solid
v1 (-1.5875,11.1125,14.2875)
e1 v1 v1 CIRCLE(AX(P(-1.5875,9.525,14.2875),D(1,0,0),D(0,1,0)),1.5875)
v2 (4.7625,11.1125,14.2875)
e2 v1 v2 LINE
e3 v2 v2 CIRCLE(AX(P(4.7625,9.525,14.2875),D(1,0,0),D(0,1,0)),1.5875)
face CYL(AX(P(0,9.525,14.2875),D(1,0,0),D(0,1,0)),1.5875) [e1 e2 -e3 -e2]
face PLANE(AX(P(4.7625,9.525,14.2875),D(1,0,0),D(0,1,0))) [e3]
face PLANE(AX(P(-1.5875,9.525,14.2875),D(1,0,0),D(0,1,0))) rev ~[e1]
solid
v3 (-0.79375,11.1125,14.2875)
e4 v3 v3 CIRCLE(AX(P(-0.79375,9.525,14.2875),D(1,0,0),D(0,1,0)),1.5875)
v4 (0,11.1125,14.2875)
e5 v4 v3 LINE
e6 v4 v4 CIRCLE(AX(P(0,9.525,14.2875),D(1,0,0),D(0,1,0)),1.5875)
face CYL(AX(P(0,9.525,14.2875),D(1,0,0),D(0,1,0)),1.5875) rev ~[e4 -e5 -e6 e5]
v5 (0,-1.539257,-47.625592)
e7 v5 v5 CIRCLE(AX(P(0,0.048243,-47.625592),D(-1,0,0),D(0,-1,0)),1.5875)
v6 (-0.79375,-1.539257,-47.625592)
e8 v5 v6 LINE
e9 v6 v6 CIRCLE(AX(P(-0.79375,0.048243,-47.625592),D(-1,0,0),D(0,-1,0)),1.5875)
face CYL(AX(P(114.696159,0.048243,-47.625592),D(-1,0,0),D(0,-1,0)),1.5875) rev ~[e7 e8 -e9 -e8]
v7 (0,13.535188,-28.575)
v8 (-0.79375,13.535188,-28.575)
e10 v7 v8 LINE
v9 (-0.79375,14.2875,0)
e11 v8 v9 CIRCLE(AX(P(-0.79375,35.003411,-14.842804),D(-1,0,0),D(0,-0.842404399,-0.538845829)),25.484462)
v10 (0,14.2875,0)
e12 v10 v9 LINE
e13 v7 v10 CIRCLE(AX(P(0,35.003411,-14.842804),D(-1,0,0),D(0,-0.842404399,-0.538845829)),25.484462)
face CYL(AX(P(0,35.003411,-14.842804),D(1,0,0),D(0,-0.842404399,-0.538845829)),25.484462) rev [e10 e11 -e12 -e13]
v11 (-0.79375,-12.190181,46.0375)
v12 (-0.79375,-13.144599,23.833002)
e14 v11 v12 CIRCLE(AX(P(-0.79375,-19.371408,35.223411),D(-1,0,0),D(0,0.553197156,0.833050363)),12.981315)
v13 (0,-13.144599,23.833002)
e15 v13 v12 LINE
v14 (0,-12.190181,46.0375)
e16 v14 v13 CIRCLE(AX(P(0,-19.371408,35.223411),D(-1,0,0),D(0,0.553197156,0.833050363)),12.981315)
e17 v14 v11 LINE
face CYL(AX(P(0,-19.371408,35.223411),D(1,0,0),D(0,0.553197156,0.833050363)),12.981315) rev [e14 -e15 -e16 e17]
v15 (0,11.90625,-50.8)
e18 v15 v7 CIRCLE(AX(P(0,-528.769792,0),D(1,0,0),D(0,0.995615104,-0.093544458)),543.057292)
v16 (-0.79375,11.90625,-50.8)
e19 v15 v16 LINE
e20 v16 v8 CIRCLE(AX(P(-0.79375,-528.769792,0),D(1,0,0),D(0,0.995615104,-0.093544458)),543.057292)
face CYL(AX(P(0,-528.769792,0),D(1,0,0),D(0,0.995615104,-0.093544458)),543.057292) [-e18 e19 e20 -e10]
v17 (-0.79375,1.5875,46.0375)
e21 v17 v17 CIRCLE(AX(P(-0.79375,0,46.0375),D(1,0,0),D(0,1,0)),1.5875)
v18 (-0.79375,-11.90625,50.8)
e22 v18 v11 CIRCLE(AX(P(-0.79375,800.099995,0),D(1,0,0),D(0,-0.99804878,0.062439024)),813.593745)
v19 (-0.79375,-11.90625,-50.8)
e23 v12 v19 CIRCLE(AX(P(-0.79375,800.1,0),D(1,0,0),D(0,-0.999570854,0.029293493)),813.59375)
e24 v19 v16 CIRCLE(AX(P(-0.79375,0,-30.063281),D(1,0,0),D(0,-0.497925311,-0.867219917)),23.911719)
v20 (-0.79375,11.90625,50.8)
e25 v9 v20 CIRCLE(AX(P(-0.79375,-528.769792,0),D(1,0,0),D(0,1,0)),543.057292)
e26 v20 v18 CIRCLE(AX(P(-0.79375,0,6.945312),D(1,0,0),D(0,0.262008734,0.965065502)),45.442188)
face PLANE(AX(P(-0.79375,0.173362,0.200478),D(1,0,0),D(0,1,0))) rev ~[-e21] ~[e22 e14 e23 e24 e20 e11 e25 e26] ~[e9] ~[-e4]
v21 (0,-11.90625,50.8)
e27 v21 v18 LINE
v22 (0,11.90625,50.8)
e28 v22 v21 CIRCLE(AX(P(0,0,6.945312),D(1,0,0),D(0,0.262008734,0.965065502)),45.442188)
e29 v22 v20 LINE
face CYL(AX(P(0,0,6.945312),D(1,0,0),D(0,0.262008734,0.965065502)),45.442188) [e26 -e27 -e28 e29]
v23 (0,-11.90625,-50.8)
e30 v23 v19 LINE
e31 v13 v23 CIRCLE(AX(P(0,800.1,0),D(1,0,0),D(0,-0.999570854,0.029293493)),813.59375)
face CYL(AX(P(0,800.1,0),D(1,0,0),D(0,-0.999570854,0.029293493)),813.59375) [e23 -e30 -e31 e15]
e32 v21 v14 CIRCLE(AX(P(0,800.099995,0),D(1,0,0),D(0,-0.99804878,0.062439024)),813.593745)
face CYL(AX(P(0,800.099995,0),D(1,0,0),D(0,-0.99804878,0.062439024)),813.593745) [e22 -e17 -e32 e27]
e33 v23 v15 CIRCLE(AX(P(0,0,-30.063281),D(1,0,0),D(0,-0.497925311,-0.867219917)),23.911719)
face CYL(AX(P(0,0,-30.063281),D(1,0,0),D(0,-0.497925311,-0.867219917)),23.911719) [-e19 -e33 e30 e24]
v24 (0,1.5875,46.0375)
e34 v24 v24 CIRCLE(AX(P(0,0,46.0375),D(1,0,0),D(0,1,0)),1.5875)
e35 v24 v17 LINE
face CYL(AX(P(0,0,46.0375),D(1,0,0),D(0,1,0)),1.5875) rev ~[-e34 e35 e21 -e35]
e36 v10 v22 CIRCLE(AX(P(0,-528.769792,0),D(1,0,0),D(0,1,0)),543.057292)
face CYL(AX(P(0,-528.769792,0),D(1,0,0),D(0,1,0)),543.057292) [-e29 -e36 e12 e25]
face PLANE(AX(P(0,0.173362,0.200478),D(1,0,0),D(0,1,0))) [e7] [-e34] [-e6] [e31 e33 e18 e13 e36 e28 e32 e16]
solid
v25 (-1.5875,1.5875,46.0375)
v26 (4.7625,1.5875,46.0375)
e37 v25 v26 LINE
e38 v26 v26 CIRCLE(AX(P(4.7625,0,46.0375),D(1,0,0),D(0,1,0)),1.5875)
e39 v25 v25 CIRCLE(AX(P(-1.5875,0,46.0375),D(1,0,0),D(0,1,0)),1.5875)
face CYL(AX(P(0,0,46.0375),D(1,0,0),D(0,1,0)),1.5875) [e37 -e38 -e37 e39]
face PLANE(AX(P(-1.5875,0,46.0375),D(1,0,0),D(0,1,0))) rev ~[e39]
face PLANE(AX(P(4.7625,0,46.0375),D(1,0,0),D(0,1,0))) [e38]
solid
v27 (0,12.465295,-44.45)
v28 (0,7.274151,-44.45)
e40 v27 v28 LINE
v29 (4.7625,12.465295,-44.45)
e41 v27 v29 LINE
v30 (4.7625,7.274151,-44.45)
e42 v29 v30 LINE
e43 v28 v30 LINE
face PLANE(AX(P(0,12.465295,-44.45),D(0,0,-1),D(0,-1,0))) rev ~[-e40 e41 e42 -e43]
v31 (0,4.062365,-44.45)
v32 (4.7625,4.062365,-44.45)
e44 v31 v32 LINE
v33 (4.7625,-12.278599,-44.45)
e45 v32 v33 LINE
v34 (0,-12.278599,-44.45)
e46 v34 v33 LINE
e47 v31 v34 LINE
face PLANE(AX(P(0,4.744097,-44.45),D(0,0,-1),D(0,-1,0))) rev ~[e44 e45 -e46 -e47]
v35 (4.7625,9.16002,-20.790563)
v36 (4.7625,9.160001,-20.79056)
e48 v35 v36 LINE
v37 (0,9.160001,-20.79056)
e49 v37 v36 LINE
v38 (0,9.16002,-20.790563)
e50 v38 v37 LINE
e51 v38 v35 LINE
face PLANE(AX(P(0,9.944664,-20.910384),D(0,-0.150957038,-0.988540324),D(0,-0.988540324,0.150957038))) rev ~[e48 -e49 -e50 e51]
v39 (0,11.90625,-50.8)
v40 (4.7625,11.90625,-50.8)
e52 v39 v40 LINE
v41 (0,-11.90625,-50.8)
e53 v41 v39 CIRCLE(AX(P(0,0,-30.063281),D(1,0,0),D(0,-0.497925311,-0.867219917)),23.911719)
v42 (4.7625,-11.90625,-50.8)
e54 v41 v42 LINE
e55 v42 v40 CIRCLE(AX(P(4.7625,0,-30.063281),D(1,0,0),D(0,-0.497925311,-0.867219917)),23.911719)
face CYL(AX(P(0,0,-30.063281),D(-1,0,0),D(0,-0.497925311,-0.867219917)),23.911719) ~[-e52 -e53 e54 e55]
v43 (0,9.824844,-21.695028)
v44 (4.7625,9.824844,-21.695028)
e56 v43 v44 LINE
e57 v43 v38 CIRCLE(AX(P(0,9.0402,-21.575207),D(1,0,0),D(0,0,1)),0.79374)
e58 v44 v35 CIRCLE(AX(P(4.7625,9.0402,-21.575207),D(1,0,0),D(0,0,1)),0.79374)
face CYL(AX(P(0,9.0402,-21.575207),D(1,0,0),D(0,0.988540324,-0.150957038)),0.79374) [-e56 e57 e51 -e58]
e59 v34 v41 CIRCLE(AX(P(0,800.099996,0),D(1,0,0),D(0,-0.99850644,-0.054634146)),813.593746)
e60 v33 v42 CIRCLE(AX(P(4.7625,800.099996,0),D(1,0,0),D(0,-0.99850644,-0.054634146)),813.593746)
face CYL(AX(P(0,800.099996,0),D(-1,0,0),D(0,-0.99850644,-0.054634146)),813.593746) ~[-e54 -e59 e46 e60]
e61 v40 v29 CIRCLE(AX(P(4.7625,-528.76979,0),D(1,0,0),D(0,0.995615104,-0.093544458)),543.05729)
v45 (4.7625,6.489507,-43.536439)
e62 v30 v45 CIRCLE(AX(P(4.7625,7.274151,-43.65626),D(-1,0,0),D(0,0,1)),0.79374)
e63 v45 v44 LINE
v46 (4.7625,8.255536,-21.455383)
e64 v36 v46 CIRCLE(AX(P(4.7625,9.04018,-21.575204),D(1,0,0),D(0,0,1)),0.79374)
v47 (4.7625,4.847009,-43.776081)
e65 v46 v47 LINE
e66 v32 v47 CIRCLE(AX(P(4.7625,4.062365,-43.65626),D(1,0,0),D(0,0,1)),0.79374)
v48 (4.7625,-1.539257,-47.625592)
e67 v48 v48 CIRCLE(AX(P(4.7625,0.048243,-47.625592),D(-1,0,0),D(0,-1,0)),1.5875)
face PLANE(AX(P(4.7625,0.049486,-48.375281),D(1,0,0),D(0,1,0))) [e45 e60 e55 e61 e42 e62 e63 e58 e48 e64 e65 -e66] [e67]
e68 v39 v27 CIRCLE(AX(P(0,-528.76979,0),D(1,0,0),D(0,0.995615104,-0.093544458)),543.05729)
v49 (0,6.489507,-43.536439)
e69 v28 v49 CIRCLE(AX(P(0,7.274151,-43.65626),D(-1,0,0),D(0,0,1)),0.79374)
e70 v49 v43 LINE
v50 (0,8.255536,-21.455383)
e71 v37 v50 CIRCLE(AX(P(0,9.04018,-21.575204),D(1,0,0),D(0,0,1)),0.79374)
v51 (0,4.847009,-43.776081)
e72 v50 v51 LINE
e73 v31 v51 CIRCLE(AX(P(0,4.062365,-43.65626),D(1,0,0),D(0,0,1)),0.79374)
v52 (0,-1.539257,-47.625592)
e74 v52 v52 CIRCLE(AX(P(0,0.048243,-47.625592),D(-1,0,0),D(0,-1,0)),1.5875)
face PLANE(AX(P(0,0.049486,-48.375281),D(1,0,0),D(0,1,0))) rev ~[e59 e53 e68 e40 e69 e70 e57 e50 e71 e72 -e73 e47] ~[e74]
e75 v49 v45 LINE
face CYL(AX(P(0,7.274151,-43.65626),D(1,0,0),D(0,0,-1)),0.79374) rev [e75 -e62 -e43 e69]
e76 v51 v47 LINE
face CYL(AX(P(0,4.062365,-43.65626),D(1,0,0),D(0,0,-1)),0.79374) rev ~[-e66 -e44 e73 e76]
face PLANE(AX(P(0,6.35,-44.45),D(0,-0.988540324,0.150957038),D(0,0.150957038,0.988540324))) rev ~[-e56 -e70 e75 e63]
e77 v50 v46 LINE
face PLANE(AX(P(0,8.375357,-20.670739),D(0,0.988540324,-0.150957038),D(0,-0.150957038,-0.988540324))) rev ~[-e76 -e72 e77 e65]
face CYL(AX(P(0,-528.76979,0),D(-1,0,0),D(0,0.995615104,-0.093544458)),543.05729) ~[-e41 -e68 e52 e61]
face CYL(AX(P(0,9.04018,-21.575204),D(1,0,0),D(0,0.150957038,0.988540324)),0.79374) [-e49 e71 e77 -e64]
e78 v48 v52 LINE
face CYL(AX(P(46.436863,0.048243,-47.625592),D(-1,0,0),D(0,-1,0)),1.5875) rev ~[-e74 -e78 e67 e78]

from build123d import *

# Parameters (mm, degrees)
F0_R          = 1.5875
F1_DEPTH      = 0.79375
F2_DEPTH      = 4.7625
F2_DEPTH_BACK = 1.5875
F3_DEPTH      = 4.7625
F4_R          = 0.79374
F7_D          = 3.175
F7_2_D        = 3.175


# Not quite as in the source:
# - a fillet or chamfer is up to 0.001 mm smaller than in the source, because OpenCascade refuses the exact size


with BuildPart() as f1:
    # F0 (on Right) → F1 (new body)
    with BuildSketch(Plane.YZ):
        with BuildLine():
            ThreePointArc((-11.90625, -50.8), (0, -53.975), (11.90625, -50.8))
            ThreePointArc((11.90625, -50.8), (12.8347328861, -39.6958564126), (13.5351884021, -28.575))
            ThreePointArc((13.5351884021, -28.575), (9.5277768783, -14.1720911273), (14.2875, 0))
            ThreePointArc((14.2875, 0), (13.6918608439, 25.4278899614), (11.90625, 50.8))
            ThreePointArc((11.90625, 50.8), (0, 52.3875), (-11.90625, 50.8))
            ThreePointArc((-11.90625, 50.8), (-12.0517066, 48.4189581239), (-12.1901812978, 46.0375))
            ThreePointArc((-12.1901812978, 46.0375), (-6.4020679088, 34.6659483313), (-13.1445991419, 23.8330024471))
            ThreePointArc((-13.1445991419, 23.8330024471), (-13.381777253, -13.4977078204), (-11.90625, -50.8))
        make_face()
        with Locations((0, 46.0375)):
            Circle(F0_R, mode=Mode.SUBTRACT)
        with Locations((9.525, 14.2875)):
            Circle(F0_R, mode=Mode.SUBTRACT)
    extrude(amount=-F1_DEPTH)

    # F7 (through all)
    with Locations(Plane.YZ.offset(4.7625)):
        with Locations((0.0482433617, -47.6255920894)):
            Hole(F7_D / 2)


with BuildPart() as f2:
    # F0 (on Right) → F2 (new body, two sides)
    with BuildSketch(Plane.YZ) as f2_sk:
        with Locations((0, 46.0375)):
            Circle(F0_R)
    extrude(amount=F2_DEPTH)
    extrude(f2_sk.sketch, amount=-F2_DEPTH_BACK)


with BuildPart() as f2b:
    # F0 (on Right) → F2, piece 2 (new body, two sides)
    with BuildSketch(Plane.YZ) as f2_2_sk:
        with Locations((9.525, 14.2875)):
            Circle(F0_R)
    extrude(amount=F2_DEPTH)
    extrude(f2_2_sk.sketch, amount=-F2_DEPTH_BACK)


with BuildPart() as f3:
    # F6 (on face) → F3 (new body)
    with BuildSketch(Plane.YZ):
        with BuildLine():
            Line((4.744096871, -44.45), (-12.2785986466, -44.45))
            ThreePointArc((-12.2785986466, -44.45), (-12.0986301104, -47.6253638923), (-11.90625, -50.8))
            ThreePointArc((-11.90625, -50.8), (0, -53.975), (11.90625, -50.8))
            ThreePointArc((11.90625, -50.8), (12.1950900719, -47.6258202864), (12.4652954557, -44.45))
            Line((12.4652954557, -44.45), (6.35, -44.45))
            Line((6.35, -44.45), (4.744096871, -44.45))
        make_face()
        Polygon((8.3753566937, -20.6707392301), (4.744096871, -44.45), (6.35, -44.45), (9.9446644586, -20.9103835273), align=None)
    extrude(amount=F3_DEPTH)

    # F4 (radius 0.79375 in the source; OpenCascade refuses exactly that, so slightly less here)
    f4_edges = [f3.edges().sort_by_distance(p)[0] for p in [
        (2.38125, 4.744097, -44.45),
        (2.38125, 6.35, -44.45),
        (2.38125, 9.944664, -20.910384),
        (2.38125, 8.375357, -20.670739),
    ]]
    fillet(f4_edges, radius=F4_R)

    # F7#2 (through all)
    with Locations(Plane.YZ.offset(4.7625)):
        with Locations((0.0482433617, -47.6255920894)):
            Hole(F7_2_D / 2)


solid = Compound([f1.part, f2.part, f2b.part, f3.part])
